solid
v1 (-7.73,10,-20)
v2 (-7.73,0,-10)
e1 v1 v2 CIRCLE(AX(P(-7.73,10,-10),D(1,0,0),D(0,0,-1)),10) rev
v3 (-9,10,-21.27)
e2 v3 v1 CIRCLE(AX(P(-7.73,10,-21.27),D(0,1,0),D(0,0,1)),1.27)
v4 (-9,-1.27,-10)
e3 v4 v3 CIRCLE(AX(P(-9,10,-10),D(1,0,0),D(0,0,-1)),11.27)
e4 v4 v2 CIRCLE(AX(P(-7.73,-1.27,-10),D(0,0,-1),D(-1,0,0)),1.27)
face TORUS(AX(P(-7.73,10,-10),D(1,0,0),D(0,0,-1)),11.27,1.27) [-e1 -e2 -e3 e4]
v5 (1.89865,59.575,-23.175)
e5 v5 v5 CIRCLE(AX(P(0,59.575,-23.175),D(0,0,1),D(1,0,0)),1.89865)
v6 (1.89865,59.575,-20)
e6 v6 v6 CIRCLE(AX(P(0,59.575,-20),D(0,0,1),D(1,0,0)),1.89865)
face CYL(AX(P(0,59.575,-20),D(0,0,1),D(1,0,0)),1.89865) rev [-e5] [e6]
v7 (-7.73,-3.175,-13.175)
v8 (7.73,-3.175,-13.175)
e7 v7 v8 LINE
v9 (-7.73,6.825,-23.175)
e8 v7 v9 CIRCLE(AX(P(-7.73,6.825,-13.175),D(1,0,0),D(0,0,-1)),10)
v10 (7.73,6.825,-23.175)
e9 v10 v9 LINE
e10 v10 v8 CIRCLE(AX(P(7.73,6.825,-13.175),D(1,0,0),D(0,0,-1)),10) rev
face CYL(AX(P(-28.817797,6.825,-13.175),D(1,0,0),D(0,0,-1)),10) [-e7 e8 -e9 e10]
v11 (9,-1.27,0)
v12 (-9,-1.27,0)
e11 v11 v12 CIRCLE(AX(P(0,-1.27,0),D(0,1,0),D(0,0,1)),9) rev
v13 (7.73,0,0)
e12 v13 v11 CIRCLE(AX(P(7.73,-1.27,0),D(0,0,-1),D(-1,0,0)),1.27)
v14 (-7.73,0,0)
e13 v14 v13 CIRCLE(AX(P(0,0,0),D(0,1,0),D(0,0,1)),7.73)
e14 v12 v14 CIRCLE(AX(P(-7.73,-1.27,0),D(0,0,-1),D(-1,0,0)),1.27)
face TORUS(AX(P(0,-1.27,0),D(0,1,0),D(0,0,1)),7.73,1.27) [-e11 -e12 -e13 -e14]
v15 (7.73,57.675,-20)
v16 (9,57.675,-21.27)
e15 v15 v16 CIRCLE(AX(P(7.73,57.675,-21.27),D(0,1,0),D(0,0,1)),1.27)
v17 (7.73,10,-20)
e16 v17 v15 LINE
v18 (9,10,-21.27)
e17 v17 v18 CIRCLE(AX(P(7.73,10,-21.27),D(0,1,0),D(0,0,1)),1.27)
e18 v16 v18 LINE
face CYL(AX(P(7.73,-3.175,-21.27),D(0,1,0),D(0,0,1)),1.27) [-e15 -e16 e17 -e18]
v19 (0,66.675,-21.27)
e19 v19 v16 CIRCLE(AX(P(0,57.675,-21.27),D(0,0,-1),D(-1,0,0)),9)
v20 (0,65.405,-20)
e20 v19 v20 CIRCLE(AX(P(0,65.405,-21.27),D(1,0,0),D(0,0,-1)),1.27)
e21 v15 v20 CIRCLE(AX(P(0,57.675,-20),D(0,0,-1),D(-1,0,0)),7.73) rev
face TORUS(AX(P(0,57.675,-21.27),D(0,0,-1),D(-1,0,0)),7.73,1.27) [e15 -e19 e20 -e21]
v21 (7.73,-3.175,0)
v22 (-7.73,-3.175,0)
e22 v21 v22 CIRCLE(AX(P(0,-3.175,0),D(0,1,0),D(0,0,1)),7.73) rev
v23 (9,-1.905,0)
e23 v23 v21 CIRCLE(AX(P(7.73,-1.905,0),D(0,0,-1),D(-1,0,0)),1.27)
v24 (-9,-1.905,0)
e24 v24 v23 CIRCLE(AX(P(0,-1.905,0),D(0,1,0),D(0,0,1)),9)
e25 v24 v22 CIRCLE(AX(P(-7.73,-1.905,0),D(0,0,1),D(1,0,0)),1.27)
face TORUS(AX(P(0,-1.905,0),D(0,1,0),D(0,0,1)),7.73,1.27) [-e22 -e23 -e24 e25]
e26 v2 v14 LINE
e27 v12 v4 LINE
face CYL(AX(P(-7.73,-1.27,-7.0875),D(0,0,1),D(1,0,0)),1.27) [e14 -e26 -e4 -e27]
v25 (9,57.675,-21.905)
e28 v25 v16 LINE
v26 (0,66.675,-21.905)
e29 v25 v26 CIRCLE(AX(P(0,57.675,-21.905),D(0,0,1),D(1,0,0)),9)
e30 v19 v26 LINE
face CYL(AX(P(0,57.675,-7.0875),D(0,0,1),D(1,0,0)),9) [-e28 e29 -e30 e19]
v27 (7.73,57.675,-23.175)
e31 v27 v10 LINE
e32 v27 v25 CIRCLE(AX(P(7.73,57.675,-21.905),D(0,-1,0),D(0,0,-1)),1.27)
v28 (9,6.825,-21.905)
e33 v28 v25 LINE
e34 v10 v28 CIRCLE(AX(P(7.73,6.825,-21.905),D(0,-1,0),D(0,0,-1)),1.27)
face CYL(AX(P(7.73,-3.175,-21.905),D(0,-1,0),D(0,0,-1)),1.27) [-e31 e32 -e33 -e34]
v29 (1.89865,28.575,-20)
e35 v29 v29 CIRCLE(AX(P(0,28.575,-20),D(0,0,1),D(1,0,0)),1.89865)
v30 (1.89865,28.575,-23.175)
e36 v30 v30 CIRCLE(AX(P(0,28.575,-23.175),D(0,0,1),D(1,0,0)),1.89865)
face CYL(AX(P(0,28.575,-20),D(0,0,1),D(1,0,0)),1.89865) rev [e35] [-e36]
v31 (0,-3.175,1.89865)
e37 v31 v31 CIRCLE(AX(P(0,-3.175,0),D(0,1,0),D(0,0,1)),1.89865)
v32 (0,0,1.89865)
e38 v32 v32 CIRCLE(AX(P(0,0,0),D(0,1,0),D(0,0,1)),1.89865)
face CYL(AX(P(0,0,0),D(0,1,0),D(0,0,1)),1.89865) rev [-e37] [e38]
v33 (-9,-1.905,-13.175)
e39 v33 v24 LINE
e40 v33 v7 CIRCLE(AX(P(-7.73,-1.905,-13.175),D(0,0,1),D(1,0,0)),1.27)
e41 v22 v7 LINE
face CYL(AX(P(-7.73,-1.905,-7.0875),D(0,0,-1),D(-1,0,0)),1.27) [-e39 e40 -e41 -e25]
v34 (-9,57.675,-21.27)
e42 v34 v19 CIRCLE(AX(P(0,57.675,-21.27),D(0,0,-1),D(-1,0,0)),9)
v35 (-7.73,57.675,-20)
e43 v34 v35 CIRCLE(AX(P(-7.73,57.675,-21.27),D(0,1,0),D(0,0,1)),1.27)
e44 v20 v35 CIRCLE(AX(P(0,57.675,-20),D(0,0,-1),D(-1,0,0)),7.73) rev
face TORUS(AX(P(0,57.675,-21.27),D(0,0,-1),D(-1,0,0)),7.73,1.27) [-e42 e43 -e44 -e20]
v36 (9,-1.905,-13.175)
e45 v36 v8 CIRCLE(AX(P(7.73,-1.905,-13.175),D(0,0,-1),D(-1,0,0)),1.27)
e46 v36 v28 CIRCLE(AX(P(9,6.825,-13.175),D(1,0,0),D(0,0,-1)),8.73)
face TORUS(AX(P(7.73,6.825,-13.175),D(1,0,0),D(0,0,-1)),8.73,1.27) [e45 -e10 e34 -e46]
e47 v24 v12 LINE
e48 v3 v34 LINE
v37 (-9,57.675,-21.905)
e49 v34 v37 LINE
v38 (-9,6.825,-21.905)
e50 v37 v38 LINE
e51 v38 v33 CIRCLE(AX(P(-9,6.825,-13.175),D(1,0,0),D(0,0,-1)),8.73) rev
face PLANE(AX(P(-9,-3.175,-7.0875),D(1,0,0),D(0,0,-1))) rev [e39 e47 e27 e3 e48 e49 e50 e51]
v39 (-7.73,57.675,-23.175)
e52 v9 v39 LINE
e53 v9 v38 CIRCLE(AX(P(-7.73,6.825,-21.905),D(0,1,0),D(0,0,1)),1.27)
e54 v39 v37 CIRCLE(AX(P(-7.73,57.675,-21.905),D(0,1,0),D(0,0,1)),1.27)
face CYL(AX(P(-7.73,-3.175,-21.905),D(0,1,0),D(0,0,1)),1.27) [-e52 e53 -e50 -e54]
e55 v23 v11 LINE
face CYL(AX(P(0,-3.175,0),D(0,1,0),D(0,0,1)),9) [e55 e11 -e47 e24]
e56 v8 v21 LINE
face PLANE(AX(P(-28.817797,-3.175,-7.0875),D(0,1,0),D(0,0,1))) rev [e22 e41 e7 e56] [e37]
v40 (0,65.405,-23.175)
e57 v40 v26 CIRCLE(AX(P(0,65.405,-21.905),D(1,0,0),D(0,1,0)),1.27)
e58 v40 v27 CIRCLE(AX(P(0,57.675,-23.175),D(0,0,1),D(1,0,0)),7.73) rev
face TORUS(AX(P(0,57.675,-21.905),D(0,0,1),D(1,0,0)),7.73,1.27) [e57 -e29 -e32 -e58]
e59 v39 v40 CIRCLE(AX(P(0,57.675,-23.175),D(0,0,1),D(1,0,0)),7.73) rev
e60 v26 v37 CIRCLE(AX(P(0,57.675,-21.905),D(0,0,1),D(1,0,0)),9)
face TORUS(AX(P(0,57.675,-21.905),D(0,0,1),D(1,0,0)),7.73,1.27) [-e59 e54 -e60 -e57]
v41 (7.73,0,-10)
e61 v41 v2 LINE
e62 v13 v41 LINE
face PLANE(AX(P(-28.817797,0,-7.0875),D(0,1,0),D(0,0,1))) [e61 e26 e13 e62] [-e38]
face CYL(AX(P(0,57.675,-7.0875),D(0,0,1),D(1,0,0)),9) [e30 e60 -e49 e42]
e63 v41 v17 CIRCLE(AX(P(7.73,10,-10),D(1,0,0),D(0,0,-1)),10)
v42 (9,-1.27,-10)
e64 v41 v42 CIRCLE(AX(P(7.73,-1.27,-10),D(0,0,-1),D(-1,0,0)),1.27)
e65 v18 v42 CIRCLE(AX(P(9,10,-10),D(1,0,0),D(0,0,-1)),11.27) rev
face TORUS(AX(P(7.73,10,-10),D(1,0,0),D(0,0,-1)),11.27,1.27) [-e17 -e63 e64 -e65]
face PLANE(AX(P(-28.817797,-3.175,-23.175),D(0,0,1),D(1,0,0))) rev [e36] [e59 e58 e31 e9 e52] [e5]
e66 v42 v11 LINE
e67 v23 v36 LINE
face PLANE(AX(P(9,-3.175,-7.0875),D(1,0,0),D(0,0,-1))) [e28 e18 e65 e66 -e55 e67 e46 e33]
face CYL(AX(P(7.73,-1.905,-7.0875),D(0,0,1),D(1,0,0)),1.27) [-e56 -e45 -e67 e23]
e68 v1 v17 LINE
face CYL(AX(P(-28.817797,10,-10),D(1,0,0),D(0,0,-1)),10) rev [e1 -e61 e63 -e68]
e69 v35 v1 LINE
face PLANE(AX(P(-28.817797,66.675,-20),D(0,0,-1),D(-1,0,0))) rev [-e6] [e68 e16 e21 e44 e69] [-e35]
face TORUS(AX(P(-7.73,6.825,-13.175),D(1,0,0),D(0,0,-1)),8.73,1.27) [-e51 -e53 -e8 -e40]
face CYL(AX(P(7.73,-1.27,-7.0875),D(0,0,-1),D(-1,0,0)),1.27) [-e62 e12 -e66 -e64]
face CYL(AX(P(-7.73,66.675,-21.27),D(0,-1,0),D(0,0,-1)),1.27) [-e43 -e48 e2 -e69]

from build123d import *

# Parameters (mm, degrees)
SKETCH1_W             = 18
SKETCH1_H             = 3.175
BASE_DEPTH            = 3.175
SKETCH1_3_W           = 18
SKETCH1_3_H           = 3.175
RISER_DEPTH           = 66.675
F_6_CLEARANCE_HOLE2_D = 3.7973
F_6_CLEARANCE_HOLE1_D = 3.7973
FILLET1_R             = 10
FILLET2_R             = 9
FILLET3_R             = 10
FILLET4_R             = 1.27


with BuildPart() as part:
    # Sketch1 → Base (new body)
    with BuildSketch(Plane(origin=(0, 0, 0), x_dir=(1, 0, 0), z_dir=(0, 1, 0))):
        with BuildLine():
            Line((-9, 0), (-9, 20))
            Line((-9, 20), (9, 20))
            Line((9, 20), (9, 0))
            ThreePointArc((9, 0), (0, -9), (-9, 0))
        make_face()
        with Locations((0, 21.5875)):
            Rectangle(SKETCH1_W, SKETCH1_H)
    extrude(amount=-BASE_DEPTH)

    # Sketch1<3> → Riser (add)
    with BuildSketch(Plane(origin=(0, 0, 0), x_dir=(1, 0, 0), z_dir=(0, 1, 0))):
        with Locations((0, 21.5875)):
            Rectangle(SKETCH1_3_W, SKETCH1_3_H)
    extrude(amount=RISER_DEPTH)

    # #6 Clearance Hole2 (through all)
    with Locations(Plane(origin=(0, 0, 0), x_dir=(-1, 0, 0), z_dir=(0, 1, 0))):
        with Locations((0, 0)):
            Hole(F_6_CLEARANCE_HOLE2_D / 2)

    # #6 Clearance Hole1 (through all)
    with Locations(Plane.XY.offset(-20)):
        with Locations((0, 59.575), (0, 28.575)):
            Hole(F_6_CLEARANCE_HOLE1_D / 2)

    # Fillet1
    fillet1_edges = [part.edges().sort_by_distance(p)[0] for p in [
        (0, 0, -20),
    ]]
    fillet(fillet1_edges, radius=FILLET1_R)

    # Fillet2
    fillet2_edges = [part.edges().sort_by_distance(p)[0] for p in [
        (-9, 66.675, -21.5875),
        (9, 66.675, -21.5875),
    ]]
    fillet(fillet2_edges, radius=FILLET2_R - 0.0001)  # a hair under: the kernel refuses the full size

    # Fillet3
    fillet3_edges = [part.edges().sort_by_distance(p)[0] for p in [
        (0, -3.175, -23.175),
    ]]
    fillet(fillet3_edges, radius=FILLET3_R)

    # Fillet4
    fillet4_edges = [part.edges().sort_by_distance(p)[0] for p in [
        (0, -3.175, 9),
        (9, -3.175, -6.5875),
        (-9, -3.175, -6.5875),
        (9, 2.928932188, -17.071067812),
        (-9, 2.928932188, -17.071067812),
        (-9, 33.83755, -20),
        (6.36399032, 64.03899032, -23.175),
        (-6.36399032, 64.03899032, -23.175),
        (9, 33.83755, -20),
        (6.36399032, 64.03899032, -20),
        (-6.36399032, 64.03899032, -20),
        (9, 0, -5),
        (9, 32.25005, -23.175),
        (9, -0.246067812, -20.246067812),
        (-9, 32.25005, -23.175),
        (-9, -0.246067812, -20.246067812),
        (0, 0, 9),
        (-9, 0, -5),
    ]]
    fillet(fillet4_edges, radius=FILLET4_R)


solid = part.part
